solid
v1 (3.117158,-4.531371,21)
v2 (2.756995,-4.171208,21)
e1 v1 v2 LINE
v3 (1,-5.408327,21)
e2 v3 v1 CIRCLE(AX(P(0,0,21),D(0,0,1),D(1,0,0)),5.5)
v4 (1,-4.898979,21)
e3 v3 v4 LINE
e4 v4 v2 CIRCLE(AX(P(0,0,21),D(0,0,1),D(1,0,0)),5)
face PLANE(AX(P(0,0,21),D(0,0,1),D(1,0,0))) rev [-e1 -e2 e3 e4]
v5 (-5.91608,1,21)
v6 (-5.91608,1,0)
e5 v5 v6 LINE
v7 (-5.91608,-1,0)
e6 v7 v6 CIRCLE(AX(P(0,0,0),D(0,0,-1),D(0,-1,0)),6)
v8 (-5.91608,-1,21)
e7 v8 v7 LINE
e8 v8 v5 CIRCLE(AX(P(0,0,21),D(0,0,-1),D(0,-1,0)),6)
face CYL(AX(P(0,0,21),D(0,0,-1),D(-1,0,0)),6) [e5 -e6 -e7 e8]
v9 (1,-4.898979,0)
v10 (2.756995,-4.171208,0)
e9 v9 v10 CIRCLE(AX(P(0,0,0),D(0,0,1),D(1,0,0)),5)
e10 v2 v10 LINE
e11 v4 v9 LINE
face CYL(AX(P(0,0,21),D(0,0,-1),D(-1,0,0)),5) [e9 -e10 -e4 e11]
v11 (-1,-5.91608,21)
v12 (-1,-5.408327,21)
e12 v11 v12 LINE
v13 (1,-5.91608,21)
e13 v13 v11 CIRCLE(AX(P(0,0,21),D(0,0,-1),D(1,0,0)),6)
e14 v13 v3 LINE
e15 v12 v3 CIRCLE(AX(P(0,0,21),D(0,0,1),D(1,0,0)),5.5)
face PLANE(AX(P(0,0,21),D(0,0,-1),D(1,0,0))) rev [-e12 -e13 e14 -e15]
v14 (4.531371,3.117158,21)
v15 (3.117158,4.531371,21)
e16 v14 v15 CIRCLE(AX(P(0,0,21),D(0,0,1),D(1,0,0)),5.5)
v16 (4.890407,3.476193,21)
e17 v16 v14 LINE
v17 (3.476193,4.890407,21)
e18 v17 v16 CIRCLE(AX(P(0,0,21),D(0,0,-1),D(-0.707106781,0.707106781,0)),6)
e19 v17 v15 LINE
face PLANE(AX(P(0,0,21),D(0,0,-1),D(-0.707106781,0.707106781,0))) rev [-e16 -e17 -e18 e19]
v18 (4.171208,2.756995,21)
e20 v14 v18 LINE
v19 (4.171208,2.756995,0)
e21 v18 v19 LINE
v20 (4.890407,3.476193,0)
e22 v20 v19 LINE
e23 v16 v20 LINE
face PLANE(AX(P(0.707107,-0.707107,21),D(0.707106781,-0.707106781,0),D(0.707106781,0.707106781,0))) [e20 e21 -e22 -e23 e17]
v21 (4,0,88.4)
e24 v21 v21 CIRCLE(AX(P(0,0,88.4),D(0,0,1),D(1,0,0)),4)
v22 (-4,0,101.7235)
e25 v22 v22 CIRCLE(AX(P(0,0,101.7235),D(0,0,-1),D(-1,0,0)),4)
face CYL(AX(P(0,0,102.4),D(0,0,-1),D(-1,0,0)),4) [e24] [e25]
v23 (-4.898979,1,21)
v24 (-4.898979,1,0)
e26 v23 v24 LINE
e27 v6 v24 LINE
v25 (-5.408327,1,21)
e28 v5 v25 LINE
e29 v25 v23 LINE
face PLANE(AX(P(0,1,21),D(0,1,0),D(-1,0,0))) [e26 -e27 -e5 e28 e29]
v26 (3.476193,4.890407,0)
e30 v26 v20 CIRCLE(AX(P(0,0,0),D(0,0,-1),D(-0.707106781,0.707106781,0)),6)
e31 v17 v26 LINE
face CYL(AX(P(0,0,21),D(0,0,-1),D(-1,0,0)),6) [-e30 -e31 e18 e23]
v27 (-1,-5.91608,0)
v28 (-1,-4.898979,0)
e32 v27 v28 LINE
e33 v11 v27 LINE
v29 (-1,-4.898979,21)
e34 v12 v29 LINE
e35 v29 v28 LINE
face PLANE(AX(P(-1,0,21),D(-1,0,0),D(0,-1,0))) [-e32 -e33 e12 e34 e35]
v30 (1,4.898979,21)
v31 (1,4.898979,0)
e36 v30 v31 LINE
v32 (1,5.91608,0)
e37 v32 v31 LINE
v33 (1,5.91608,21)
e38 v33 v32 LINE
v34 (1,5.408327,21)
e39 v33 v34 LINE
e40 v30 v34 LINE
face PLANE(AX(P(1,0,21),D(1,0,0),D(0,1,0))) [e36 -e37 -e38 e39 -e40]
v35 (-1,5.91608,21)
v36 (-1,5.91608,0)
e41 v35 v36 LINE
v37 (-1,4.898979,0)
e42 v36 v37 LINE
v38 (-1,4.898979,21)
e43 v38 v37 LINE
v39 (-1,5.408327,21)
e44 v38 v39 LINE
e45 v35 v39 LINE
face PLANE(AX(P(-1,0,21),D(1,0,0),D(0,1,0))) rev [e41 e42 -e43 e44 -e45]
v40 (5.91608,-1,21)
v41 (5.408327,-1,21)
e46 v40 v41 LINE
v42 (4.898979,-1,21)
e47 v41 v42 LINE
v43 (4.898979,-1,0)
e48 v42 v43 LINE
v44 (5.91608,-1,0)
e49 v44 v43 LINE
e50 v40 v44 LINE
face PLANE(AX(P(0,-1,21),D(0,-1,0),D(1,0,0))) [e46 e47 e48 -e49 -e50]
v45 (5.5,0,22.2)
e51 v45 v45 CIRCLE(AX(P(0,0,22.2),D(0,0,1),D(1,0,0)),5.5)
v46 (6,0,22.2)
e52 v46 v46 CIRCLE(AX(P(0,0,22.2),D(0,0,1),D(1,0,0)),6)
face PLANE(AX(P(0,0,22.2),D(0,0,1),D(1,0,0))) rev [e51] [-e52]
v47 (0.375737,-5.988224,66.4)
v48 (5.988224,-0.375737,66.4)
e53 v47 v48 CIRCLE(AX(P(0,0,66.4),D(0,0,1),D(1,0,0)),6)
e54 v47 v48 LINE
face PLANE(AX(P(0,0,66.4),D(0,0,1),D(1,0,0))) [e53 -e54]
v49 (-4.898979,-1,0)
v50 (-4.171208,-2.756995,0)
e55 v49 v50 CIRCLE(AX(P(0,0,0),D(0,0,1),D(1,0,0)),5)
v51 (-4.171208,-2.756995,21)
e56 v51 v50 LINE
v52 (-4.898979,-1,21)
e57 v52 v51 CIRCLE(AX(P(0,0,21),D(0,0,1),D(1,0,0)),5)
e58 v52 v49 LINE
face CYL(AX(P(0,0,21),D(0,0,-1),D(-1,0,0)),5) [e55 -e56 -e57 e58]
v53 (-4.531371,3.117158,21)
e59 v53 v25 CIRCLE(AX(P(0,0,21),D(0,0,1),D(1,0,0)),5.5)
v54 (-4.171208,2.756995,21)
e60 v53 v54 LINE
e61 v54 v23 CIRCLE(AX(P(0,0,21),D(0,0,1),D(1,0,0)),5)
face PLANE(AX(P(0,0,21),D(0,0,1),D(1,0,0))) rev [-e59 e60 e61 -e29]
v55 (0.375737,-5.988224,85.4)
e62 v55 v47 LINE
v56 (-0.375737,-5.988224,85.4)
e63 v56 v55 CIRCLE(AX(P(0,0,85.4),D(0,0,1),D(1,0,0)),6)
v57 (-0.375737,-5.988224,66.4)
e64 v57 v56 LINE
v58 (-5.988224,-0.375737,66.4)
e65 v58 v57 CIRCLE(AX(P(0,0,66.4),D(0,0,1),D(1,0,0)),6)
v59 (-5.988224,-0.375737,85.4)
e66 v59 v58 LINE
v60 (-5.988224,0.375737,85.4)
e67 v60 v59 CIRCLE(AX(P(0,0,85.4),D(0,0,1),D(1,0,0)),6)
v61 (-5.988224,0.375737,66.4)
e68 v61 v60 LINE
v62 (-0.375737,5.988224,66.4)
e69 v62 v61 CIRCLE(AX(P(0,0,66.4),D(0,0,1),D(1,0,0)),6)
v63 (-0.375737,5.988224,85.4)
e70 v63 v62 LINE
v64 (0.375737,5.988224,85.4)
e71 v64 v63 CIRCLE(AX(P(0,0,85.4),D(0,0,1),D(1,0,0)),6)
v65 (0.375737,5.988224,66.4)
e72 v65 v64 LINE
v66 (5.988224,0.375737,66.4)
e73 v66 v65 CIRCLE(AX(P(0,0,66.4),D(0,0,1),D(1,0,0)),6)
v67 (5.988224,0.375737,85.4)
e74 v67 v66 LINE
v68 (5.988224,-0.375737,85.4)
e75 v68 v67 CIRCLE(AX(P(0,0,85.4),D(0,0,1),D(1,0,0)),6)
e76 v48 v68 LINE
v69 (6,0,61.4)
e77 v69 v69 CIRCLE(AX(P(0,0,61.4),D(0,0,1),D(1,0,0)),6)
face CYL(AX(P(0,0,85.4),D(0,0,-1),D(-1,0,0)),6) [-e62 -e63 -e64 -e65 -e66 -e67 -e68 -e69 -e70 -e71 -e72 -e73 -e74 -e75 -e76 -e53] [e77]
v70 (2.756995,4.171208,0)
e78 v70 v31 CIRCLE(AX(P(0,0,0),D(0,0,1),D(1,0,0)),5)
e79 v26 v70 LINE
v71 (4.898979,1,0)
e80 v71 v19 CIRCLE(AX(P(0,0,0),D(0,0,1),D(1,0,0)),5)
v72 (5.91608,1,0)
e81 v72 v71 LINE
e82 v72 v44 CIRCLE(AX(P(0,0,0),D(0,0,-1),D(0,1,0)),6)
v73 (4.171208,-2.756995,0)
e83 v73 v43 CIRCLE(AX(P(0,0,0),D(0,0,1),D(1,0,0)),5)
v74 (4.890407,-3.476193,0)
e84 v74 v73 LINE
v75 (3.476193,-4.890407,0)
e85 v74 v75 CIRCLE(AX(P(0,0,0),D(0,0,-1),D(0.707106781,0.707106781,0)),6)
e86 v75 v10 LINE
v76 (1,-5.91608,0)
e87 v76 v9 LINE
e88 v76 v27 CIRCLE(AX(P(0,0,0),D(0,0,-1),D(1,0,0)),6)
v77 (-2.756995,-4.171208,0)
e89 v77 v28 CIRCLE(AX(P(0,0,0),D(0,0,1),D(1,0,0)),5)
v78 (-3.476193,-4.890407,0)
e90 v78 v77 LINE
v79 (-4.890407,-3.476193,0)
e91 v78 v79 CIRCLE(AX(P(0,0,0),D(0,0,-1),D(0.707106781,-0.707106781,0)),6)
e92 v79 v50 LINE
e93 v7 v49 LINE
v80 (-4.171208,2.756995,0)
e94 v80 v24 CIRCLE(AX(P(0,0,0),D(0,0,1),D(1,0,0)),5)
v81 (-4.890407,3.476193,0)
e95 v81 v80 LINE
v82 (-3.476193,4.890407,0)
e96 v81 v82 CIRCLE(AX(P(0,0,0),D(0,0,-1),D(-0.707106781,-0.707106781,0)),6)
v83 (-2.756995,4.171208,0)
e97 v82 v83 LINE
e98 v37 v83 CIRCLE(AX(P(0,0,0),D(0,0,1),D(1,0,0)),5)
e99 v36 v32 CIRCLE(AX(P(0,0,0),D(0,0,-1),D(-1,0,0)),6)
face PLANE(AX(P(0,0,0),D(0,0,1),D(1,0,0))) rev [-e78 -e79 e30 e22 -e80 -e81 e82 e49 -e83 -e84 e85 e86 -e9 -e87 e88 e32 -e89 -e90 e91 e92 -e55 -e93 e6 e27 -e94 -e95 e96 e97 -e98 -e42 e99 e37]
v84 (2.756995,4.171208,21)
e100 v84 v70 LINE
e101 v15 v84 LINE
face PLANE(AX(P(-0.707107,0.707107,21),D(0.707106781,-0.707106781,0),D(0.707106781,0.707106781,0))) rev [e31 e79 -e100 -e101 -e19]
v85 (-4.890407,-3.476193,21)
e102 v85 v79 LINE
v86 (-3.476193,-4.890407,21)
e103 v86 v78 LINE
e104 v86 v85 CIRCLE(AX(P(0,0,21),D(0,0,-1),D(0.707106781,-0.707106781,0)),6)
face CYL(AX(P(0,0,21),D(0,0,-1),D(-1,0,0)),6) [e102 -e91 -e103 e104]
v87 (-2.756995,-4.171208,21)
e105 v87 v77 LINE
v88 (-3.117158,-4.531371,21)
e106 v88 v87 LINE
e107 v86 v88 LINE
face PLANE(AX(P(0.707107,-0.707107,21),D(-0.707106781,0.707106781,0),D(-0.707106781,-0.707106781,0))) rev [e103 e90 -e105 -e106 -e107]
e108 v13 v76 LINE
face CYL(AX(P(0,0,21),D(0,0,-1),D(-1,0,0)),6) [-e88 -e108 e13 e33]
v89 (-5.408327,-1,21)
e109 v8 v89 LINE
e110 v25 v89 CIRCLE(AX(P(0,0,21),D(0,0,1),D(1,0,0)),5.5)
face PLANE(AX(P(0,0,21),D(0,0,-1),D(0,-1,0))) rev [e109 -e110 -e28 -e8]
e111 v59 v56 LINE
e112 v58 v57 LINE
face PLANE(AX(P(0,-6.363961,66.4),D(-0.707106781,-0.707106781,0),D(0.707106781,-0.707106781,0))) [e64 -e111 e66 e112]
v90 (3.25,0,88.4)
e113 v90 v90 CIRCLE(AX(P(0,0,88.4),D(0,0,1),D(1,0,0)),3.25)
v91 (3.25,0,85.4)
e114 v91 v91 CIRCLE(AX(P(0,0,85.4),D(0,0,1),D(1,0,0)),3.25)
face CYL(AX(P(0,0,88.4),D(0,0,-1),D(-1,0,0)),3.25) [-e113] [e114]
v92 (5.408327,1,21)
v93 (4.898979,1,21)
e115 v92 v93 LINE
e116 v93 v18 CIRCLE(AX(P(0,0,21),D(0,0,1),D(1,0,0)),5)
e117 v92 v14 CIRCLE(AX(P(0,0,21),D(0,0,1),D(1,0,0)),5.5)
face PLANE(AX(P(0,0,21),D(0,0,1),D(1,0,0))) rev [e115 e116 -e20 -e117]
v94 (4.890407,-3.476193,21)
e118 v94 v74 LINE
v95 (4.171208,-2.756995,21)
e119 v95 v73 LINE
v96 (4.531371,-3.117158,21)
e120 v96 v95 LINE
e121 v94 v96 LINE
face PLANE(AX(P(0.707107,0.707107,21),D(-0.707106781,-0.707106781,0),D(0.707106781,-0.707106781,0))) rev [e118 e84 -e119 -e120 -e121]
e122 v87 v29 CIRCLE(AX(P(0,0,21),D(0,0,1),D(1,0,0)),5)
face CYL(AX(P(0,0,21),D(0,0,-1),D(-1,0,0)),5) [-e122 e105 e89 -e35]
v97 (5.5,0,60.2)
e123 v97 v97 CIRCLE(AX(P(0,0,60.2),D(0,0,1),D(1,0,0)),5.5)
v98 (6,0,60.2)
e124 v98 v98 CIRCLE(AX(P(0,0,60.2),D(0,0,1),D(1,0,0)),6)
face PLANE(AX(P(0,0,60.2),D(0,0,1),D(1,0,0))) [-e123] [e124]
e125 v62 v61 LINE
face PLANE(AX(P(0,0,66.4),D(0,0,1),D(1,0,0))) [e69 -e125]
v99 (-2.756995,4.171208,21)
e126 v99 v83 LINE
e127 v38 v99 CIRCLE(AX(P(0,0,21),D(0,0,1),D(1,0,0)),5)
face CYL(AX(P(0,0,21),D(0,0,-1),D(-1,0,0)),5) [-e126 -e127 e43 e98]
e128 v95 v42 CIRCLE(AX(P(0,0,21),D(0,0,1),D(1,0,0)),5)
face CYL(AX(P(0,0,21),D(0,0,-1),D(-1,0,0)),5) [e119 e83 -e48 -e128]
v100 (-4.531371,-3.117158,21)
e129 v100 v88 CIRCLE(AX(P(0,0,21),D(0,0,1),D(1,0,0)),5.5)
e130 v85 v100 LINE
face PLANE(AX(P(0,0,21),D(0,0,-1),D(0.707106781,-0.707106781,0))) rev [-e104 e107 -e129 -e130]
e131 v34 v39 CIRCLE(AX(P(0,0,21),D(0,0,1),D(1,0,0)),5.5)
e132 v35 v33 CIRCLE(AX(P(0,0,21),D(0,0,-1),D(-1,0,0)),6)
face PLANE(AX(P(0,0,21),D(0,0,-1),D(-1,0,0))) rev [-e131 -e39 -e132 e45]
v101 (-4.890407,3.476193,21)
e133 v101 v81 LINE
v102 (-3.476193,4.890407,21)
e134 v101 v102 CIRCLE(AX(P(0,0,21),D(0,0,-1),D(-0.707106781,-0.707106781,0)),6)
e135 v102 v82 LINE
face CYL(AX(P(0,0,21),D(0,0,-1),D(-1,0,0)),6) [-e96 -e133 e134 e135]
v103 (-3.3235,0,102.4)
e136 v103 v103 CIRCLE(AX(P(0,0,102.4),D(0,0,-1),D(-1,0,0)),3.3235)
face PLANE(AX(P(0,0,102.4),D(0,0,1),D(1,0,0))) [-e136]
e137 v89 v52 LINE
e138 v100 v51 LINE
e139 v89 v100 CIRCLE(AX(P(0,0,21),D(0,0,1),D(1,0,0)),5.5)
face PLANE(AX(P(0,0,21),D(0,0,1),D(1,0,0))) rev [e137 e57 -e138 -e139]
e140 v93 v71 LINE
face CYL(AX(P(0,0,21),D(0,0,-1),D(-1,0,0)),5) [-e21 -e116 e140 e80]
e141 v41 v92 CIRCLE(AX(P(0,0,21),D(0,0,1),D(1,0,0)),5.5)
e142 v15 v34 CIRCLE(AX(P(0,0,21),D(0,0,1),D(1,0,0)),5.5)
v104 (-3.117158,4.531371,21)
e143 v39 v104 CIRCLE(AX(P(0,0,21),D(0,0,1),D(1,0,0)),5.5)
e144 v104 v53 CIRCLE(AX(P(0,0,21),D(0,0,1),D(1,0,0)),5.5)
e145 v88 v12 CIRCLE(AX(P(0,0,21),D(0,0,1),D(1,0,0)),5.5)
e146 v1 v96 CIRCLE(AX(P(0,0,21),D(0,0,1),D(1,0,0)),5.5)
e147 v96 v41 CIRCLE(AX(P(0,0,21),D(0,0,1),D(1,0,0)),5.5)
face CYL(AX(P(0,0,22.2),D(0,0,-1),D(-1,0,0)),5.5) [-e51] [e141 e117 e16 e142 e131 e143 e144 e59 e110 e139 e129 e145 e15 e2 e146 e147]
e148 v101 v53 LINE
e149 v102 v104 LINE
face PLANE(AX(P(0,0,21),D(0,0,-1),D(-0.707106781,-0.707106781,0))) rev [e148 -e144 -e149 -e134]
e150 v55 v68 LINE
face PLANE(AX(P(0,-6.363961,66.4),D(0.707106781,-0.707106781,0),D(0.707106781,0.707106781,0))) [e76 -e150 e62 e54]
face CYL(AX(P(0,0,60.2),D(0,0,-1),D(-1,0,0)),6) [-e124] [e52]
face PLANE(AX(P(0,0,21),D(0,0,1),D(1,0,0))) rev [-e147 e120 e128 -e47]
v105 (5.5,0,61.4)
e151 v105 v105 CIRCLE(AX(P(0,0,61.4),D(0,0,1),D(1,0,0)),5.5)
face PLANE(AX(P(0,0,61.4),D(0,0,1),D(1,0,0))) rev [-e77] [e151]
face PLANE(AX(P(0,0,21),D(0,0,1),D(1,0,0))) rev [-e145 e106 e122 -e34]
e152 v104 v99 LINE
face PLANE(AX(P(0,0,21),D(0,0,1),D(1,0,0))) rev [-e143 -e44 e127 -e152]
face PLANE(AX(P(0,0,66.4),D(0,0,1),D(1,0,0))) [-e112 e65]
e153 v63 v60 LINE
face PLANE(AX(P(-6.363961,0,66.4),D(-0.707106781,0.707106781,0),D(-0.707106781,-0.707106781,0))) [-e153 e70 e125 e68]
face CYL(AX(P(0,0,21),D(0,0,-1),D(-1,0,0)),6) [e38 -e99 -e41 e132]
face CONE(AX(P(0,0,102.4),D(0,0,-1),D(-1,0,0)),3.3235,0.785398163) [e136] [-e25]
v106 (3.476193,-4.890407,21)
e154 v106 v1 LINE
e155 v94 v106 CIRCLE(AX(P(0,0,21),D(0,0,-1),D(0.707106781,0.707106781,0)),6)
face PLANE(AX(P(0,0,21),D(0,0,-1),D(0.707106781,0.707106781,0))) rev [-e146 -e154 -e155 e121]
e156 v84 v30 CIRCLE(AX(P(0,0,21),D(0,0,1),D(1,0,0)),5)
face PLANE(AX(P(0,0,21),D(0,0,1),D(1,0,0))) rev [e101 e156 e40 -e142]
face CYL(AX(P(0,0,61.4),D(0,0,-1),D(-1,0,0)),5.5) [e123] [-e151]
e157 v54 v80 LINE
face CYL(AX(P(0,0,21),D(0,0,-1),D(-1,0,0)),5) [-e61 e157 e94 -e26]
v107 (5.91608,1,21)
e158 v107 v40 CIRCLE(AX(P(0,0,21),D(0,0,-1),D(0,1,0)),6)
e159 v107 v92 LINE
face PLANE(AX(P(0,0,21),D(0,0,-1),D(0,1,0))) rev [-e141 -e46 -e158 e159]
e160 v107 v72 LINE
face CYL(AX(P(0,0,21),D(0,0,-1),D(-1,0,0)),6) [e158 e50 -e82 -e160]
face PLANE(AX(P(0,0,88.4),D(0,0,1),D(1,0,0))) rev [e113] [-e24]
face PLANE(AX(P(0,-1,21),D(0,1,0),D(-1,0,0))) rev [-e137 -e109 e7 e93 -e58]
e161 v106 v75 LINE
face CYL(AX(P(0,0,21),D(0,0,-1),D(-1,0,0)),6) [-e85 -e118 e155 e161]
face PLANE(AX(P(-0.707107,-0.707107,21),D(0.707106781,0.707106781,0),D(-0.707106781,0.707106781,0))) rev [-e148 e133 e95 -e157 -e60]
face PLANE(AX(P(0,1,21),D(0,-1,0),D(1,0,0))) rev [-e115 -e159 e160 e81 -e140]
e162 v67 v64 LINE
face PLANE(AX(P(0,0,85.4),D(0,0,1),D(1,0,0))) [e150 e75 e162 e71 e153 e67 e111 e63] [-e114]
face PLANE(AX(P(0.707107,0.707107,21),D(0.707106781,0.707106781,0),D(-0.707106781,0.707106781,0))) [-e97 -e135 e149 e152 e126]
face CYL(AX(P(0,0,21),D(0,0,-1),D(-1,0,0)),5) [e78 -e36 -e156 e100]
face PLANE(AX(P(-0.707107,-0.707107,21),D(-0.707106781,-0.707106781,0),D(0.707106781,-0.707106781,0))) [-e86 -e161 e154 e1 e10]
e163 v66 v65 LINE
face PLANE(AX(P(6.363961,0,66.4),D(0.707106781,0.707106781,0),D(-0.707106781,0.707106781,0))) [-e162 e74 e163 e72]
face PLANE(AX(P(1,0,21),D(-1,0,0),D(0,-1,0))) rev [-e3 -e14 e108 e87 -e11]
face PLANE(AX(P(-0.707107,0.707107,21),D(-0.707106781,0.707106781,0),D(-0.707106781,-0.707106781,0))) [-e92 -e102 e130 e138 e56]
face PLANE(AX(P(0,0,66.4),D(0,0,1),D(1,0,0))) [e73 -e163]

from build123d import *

# Parameters (mm, degrees)
SKETCH_1_R               = 5
EXTRUDE_1_DEPTH          = 21
SKETCH_2_R               = 5.5
EXTRUDE_2_DEPTH          = 1.2
SKETCH_3_R               = 6
EXTRUDE_3_DEPTH          = 38
SKETCH_4_R               = 5.5
EXTRUDE_4_DEPTH          = 1.2
SKETCH_5_R               = 6
EXTRUDE_5_DEPTH          = 24
SKETCH_6_R               = 3.25
EXTRUDE_6_DEPTH          = 3
SKETCH_7_R               = 4
EXTRUDE_7_DEPTH          = 14
SKETCH_9_OUTSIDE_W       = 34.76
SKETCH_9_OUTSIDE_H       = 34.76
CUT_EXTRUDE_1_DEPTH      = 19
EXTRUDE_8_DEPTH          = 21
PATTERN_CIRCULAR_1_COUNT = 8


# Read off the part's stored shape, not the designer's step: M8 机械螺纹 螺柱1
with BuildPart() as part:
    # 草图1 → 凸台-拉伸1 (new body)
    with BuildSketch(Plane.XY):
        with Locations(Location((0, 0, 0), (0, 0, 180))):
            Circle(SKETCH_1_R)
    extrude(amount=EXTRUDE_1_DEPTH)

    # 草图2 → 凸台-拉伸2 (add)
    with BuildSketch(Plane.XY.offset(21)):
        Circle(SKETCH_2_R)
    extrude(amount=EXTRUDE_2_DEPTH)

    # 草图3 → 凸台-拉伸3 (add)
    with BuildSketch(Plane.XY.offset(22.2)):
        Circle(SKETCH_3_R)
    extrude(amount=EXTRUDE_3_DEPTH)

    # 草图4 → 凸台-拉伸4 (add)
    with BuildSketch(Plane.XY.offset(60.2)):
        Circle(SKETCH_4_R)
    extrude(amount=EXTRUDE_4_DEPTH)

    # 草图5 → 凸台-拉伸5 (add)
    with BuildSketch(Plane.XY.offset(61.4)):
        Circle(SKETCH_5_R)
    extrude(amount=EXTRUDE_5_DEPTH)

    # 草图6 → 凸台-拉伸6 (add)
    with BuildSketch(Plane.XY.offset(85.4)):
        Circle(SKETCH_6_R)
    extrude(amount=EXTRUDE_6_DEPTH)

    # 草图7 → 凸台-拉伸7 (add)
    with BuildSketch(Plane.XY.offset(88.4)):
        Circle(SKETCH_7_R)
    extrude(amount=EXTRUDE_7_DEPTH)

    # M8 机械螺纹 螺柱1 outline → M8 机械螺纹 螺柱1 (revolve, cut)
    with BuildSketch(Plane.XZ):
        Polygon((4, 102.4), (3.3235, 102.4), (4, 101.7235), align=None)
    revolve(axis=Axis((0, 0, 0), (0, 0, 1)), mode=Mode.SUBTRACT)

    # 草图9 outside → 切除-拉伸1 (cut)
    with BuildSketch(Plane.XY.offset(85.4)):
        Rectangle(SKETCH_9_OUTSIDE_W, SKETCH_9_OUTSIDE_H)
        Polygon((0, -6.363961031), (6.363961031, 0), (0, 6.363961031), (-6.363961031, 0), align=None, mode=Mode.SUBTRACT)
    extrude(amount=-CUT_EXTRUDE_1_DEPTH, mode=Mode.SUBTRACT)

    # 草图10 → 凸台-拉伸8 (add)
    with BuildSketch(Plane(origin=(0, 0, 0), x_dir=(-1, 0, 0), z_dir=(0, 0, -1))):
        with BuildLine():
            ThreePointArc((1, 5.916079783), (0, 6), (-1, 5.916079783))
            Line((-1, 5.916079783), (-1, 4.898979486))
            ThreePointArc((-1, 4.898979486), (0, 5), (1, 4.898979486))
            Line((1, 4.898979486), (1, 5.916079783))
        make_face()
    extrude_8 = extrude(amount=-EXTRUDE_8_DEPTH)

    # 阵列(圆周)1: 凸台-拉伸8 ×8 about axis
    pattern_circular_1_axis = Axis((0, 0, 0), (0, 0, 1))
    for i in range(1, PATTERN_CIRCULAR_1_COUNT):
        add(extrude_8.rotate(pattern_circular_1_axis, i * 360 / PATTERN_CIRCULAR_1_COUNT))


solid = part.part
